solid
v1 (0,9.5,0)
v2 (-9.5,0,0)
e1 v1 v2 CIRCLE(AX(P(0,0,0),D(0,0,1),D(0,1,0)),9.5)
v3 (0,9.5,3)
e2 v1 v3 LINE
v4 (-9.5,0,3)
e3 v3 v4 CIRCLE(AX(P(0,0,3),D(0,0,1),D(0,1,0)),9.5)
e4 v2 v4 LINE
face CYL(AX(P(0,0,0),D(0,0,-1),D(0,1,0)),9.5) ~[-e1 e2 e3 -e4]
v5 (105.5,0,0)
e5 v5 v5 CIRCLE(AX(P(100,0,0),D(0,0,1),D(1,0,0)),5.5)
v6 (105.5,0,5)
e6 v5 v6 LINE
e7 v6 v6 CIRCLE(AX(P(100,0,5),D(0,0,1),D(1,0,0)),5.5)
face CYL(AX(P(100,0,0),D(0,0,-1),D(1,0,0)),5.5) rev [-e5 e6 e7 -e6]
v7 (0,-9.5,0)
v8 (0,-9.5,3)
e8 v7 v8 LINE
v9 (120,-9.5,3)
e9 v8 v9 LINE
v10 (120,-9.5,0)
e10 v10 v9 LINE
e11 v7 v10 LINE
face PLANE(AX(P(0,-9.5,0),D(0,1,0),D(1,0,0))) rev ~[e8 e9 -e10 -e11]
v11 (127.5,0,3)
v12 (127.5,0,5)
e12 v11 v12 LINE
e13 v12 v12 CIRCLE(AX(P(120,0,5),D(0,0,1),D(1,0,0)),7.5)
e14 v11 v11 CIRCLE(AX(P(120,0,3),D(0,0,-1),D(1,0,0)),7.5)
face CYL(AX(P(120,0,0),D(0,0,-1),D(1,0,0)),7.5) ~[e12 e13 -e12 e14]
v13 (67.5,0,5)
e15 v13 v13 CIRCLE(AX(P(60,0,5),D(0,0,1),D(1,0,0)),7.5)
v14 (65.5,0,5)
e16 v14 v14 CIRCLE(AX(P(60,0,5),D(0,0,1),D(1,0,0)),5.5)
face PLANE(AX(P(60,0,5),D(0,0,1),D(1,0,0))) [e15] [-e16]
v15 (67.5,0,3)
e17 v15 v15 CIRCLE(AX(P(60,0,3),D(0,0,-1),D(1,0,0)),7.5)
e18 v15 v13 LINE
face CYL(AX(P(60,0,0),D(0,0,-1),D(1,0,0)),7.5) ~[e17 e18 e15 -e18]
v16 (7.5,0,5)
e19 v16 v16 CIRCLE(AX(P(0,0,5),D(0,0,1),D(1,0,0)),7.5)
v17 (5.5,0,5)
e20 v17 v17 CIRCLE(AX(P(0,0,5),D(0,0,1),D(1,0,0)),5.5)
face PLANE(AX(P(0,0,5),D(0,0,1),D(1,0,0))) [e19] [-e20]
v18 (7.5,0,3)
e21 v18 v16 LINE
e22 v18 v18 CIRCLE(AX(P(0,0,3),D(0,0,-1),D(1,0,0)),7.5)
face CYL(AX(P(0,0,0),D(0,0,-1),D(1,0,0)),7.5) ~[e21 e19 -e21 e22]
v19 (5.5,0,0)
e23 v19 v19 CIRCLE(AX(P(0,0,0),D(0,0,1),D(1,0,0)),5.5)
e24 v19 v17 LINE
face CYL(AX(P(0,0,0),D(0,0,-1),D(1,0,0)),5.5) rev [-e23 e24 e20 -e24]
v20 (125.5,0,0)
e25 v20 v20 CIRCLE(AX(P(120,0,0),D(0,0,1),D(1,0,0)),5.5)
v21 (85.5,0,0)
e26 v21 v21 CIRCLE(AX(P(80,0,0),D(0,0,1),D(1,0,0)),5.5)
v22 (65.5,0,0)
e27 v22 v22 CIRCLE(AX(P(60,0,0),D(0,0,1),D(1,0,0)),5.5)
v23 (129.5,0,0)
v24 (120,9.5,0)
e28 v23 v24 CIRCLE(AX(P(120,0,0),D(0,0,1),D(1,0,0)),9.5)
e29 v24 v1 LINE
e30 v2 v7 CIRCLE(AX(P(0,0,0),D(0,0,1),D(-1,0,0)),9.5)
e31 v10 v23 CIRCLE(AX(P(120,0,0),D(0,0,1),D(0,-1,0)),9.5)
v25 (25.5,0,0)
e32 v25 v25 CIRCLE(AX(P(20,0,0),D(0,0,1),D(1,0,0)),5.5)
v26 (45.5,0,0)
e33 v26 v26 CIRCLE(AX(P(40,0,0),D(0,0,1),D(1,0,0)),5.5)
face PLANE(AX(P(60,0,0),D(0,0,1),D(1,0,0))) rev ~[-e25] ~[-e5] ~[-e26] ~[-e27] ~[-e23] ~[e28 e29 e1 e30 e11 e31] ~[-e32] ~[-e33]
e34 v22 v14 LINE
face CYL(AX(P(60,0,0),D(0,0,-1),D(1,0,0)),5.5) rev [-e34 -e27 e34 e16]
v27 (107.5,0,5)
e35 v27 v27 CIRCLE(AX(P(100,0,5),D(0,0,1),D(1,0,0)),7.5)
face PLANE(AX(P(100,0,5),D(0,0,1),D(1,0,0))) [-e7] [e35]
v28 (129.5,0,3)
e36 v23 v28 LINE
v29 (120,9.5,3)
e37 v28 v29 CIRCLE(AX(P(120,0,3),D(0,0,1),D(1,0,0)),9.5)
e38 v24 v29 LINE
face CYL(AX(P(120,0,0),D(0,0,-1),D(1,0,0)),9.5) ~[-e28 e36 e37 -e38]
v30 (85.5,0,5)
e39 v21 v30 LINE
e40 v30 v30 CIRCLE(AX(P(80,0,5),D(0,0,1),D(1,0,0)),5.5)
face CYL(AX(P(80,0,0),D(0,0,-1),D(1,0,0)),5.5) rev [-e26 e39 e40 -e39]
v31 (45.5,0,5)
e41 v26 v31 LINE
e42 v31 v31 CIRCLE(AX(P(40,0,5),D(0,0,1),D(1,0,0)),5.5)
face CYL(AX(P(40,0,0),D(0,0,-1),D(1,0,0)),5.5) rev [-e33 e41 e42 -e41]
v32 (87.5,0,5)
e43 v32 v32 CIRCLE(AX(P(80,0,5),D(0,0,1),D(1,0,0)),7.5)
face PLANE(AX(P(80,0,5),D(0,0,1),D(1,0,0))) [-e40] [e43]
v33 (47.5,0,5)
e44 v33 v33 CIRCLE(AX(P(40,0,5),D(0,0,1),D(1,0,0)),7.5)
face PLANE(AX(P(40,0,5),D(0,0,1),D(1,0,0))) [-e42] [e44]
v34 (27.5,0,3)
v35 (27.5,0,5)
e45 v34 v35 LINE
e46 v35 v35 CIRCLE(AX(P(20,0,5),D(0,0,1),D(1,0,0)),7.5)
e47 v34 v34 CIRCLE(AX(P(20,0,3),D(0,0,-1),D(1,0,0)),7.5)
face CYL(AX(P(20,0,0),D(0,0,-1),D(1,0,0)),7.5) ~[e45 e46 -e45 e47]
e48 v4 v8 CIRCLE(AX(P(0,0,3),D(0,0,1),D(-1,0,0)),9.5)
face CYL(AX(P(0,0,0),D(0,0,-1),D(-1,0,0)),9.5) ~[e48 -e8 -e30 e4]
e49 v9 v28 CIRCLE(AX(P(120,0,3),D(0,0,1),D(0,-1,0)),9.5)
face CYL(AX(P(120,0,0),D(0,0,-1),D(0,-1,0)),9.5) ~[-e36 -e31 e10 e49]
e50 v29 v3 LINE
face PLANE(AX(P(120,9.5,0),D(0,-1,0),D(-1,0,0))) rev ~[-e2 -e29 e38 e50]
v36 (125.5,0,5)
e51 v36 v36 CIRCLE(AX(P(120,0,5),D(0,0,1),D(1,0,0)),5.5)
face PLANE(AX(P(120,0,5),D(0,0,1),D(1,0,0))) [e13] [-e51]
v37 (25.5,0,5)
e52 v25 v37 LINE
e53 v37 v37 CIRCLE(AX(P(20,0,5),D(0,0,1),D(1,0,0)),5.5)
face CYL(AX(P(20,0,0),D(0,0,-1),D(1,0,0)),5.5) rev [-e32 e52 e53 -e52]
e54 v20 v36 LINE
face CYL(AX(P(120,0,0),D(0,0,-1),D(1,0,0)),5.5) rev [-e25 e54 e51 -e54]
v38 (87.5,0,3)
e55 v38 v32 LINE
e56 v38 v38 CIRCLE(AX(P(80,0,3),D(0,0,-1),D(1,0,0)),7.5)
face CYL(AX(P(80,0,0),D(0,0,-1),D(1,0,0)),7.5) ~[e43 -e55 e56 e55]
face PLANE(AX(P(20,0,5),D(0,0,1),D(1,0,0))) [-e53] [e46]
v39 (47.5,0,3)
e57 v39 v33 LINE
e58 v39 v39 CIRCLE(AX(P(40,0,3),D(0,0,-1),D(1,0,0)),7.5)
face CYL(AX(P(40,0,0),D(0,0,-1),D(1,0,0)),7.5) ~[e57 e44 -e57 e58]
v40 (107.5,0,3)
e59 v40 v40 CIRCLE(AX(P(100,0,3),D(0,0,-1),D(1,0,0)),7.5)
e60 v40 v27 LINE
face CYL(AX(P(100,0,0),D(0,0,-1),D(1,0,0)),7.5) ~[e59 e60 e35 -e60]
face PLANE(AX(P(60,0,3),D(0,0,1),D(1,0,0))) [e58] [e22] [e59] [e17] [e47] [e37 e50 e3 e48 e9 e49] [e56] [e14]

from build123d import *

# Parameters (mm, degrees)
F2_R     = 7.5
F2_R_2   = 5.5
F3_DEPTH = 3
F4_DEPTH = 5


# Not quite as in the source:
# - a feature names something its author has since deleted; it is built from what else it names


with BuildPart() as f3:
    # F2 (on Top) → F3 (new body)
    with BuildSketch(Plane.XY):
        with BuildLine():
            Line((120, 9.5), (0, 9.5))
            ThreePointArc((0, 9.5), (-6.7175144213, 6.7175144213), (-9.5, 0))
            ThreePointArc((-9.5, 0), (-6.7175144213, -6.7175144213), (0, -9.5))
            Line((0, -9.5), (120, -9.5))
            ThreePointArc((120, -9.5), (126.7175144213, -6.7175144213), (129.5, 0))
            ThreePointArc((129.5, 0), (126.7175144213, 6.7175144213), (120, 9.5))
        make_face()
        Circle(F2_R, mode=Mode.SUBTRACT)
        with Locations((20, 0)):
            Circle(F2_R, mode=Mode.SUBTRACT)
        with Locations((40, 0)):
            Circle(F2_R, mode=Mode.SUBTRACT)
        with Locations((60, 0)):
            Circle(F2_R, mode=Mode.SUBTRACT)
        with Locations((80, 0)):
            Circle(F2_R, mode=Mode.SUBTRACT)
        with Locations((100, 0)):
            Circle(F2_R, mode=Mode.SUBTRACT)
        with Locations((120, 0)):
            Circle(F2_R, mode=Mode.SUBTRACT)
        Circle(F2_R)
        Circle(F2_R_2, mode=Mode.SUBTRACT)
        with Locations((20, 0)):
            Circle(F2_R)
        with Locations((20, 0)):
            Circle(F2_R_2, mode=Mode.SUBTRACT)
        with Locations((40, 0)):
            Circle(F2_R)
        with Locations((40, 0)):
            Circle(F2_R_2, mode=Mode.SUBTRACT)
        with Locations((60, 0)):
            Circle(F2_R)
        with Locations((60, 0)):
            Circle(F2_R_2, mode=Mode.SUBTRACT)
        with Locations((80, 0)):
            Circle(F2_R)
        with Locations((80, 0)):
            Circle(F2_R_2, mode=Mode.SUBTRACT)
        with Locations((100, 0)):
            Circle(F2_R)
        with Locations((100, 0)):
            Circle(F2_R_2, mode=Mode.SUBTRACT)
        with Locations((120, 0)):
            Circle(F2_R)
        with Locations((120, 0)):
            Circle(F2_R_2, mode=Mode.SUBTRACT)
    extrude(amount=F3_DEPTH)

    # F2 (on Top) → F4 (join)
    with BuildSketch(Plane.XY):
        Circle(F2_R)
        Circle(F2_R_2, mode=Mode.SUBTRACT)
        with Locations((20, 0)):
            Circle(F2_R)
        with Locations((20, 0)):
            Circle(F2_R_2, mode=Mode.SUBTRACT)
        with Locations((40, 0)):
            Circle(F2_R)
        with Locations((40, 0)):
            Circle(F2_R_2, mode=Mode.SUBTRACT)
        with Locations((60, 0)):
            Circle(F2_R)
        with Locations((60, 0)):
            Circle(F2_R_2, mode=Mode.SUBTRACT)
        with Locations((80, 0)):
            Circle(F2_R)
        with Locations((80, 0)):
            Circle(F2_R_2, mode=Mode.SUBTRACT)
        with Locations((100, 0)):
            Circle(F2_R)
        with Locations((100, 0)):
            Circle(F2_R_2, mode=Mode.SUBTRACT)
        with Locations((120, 0)):
            Circle(F2_R)
        with Locations((120, 0)):
            Circle(F2_R_2, mode=Mode.SUBTRACT)
    extrude(amount=F4_DEPTH)


solid = f3.part
